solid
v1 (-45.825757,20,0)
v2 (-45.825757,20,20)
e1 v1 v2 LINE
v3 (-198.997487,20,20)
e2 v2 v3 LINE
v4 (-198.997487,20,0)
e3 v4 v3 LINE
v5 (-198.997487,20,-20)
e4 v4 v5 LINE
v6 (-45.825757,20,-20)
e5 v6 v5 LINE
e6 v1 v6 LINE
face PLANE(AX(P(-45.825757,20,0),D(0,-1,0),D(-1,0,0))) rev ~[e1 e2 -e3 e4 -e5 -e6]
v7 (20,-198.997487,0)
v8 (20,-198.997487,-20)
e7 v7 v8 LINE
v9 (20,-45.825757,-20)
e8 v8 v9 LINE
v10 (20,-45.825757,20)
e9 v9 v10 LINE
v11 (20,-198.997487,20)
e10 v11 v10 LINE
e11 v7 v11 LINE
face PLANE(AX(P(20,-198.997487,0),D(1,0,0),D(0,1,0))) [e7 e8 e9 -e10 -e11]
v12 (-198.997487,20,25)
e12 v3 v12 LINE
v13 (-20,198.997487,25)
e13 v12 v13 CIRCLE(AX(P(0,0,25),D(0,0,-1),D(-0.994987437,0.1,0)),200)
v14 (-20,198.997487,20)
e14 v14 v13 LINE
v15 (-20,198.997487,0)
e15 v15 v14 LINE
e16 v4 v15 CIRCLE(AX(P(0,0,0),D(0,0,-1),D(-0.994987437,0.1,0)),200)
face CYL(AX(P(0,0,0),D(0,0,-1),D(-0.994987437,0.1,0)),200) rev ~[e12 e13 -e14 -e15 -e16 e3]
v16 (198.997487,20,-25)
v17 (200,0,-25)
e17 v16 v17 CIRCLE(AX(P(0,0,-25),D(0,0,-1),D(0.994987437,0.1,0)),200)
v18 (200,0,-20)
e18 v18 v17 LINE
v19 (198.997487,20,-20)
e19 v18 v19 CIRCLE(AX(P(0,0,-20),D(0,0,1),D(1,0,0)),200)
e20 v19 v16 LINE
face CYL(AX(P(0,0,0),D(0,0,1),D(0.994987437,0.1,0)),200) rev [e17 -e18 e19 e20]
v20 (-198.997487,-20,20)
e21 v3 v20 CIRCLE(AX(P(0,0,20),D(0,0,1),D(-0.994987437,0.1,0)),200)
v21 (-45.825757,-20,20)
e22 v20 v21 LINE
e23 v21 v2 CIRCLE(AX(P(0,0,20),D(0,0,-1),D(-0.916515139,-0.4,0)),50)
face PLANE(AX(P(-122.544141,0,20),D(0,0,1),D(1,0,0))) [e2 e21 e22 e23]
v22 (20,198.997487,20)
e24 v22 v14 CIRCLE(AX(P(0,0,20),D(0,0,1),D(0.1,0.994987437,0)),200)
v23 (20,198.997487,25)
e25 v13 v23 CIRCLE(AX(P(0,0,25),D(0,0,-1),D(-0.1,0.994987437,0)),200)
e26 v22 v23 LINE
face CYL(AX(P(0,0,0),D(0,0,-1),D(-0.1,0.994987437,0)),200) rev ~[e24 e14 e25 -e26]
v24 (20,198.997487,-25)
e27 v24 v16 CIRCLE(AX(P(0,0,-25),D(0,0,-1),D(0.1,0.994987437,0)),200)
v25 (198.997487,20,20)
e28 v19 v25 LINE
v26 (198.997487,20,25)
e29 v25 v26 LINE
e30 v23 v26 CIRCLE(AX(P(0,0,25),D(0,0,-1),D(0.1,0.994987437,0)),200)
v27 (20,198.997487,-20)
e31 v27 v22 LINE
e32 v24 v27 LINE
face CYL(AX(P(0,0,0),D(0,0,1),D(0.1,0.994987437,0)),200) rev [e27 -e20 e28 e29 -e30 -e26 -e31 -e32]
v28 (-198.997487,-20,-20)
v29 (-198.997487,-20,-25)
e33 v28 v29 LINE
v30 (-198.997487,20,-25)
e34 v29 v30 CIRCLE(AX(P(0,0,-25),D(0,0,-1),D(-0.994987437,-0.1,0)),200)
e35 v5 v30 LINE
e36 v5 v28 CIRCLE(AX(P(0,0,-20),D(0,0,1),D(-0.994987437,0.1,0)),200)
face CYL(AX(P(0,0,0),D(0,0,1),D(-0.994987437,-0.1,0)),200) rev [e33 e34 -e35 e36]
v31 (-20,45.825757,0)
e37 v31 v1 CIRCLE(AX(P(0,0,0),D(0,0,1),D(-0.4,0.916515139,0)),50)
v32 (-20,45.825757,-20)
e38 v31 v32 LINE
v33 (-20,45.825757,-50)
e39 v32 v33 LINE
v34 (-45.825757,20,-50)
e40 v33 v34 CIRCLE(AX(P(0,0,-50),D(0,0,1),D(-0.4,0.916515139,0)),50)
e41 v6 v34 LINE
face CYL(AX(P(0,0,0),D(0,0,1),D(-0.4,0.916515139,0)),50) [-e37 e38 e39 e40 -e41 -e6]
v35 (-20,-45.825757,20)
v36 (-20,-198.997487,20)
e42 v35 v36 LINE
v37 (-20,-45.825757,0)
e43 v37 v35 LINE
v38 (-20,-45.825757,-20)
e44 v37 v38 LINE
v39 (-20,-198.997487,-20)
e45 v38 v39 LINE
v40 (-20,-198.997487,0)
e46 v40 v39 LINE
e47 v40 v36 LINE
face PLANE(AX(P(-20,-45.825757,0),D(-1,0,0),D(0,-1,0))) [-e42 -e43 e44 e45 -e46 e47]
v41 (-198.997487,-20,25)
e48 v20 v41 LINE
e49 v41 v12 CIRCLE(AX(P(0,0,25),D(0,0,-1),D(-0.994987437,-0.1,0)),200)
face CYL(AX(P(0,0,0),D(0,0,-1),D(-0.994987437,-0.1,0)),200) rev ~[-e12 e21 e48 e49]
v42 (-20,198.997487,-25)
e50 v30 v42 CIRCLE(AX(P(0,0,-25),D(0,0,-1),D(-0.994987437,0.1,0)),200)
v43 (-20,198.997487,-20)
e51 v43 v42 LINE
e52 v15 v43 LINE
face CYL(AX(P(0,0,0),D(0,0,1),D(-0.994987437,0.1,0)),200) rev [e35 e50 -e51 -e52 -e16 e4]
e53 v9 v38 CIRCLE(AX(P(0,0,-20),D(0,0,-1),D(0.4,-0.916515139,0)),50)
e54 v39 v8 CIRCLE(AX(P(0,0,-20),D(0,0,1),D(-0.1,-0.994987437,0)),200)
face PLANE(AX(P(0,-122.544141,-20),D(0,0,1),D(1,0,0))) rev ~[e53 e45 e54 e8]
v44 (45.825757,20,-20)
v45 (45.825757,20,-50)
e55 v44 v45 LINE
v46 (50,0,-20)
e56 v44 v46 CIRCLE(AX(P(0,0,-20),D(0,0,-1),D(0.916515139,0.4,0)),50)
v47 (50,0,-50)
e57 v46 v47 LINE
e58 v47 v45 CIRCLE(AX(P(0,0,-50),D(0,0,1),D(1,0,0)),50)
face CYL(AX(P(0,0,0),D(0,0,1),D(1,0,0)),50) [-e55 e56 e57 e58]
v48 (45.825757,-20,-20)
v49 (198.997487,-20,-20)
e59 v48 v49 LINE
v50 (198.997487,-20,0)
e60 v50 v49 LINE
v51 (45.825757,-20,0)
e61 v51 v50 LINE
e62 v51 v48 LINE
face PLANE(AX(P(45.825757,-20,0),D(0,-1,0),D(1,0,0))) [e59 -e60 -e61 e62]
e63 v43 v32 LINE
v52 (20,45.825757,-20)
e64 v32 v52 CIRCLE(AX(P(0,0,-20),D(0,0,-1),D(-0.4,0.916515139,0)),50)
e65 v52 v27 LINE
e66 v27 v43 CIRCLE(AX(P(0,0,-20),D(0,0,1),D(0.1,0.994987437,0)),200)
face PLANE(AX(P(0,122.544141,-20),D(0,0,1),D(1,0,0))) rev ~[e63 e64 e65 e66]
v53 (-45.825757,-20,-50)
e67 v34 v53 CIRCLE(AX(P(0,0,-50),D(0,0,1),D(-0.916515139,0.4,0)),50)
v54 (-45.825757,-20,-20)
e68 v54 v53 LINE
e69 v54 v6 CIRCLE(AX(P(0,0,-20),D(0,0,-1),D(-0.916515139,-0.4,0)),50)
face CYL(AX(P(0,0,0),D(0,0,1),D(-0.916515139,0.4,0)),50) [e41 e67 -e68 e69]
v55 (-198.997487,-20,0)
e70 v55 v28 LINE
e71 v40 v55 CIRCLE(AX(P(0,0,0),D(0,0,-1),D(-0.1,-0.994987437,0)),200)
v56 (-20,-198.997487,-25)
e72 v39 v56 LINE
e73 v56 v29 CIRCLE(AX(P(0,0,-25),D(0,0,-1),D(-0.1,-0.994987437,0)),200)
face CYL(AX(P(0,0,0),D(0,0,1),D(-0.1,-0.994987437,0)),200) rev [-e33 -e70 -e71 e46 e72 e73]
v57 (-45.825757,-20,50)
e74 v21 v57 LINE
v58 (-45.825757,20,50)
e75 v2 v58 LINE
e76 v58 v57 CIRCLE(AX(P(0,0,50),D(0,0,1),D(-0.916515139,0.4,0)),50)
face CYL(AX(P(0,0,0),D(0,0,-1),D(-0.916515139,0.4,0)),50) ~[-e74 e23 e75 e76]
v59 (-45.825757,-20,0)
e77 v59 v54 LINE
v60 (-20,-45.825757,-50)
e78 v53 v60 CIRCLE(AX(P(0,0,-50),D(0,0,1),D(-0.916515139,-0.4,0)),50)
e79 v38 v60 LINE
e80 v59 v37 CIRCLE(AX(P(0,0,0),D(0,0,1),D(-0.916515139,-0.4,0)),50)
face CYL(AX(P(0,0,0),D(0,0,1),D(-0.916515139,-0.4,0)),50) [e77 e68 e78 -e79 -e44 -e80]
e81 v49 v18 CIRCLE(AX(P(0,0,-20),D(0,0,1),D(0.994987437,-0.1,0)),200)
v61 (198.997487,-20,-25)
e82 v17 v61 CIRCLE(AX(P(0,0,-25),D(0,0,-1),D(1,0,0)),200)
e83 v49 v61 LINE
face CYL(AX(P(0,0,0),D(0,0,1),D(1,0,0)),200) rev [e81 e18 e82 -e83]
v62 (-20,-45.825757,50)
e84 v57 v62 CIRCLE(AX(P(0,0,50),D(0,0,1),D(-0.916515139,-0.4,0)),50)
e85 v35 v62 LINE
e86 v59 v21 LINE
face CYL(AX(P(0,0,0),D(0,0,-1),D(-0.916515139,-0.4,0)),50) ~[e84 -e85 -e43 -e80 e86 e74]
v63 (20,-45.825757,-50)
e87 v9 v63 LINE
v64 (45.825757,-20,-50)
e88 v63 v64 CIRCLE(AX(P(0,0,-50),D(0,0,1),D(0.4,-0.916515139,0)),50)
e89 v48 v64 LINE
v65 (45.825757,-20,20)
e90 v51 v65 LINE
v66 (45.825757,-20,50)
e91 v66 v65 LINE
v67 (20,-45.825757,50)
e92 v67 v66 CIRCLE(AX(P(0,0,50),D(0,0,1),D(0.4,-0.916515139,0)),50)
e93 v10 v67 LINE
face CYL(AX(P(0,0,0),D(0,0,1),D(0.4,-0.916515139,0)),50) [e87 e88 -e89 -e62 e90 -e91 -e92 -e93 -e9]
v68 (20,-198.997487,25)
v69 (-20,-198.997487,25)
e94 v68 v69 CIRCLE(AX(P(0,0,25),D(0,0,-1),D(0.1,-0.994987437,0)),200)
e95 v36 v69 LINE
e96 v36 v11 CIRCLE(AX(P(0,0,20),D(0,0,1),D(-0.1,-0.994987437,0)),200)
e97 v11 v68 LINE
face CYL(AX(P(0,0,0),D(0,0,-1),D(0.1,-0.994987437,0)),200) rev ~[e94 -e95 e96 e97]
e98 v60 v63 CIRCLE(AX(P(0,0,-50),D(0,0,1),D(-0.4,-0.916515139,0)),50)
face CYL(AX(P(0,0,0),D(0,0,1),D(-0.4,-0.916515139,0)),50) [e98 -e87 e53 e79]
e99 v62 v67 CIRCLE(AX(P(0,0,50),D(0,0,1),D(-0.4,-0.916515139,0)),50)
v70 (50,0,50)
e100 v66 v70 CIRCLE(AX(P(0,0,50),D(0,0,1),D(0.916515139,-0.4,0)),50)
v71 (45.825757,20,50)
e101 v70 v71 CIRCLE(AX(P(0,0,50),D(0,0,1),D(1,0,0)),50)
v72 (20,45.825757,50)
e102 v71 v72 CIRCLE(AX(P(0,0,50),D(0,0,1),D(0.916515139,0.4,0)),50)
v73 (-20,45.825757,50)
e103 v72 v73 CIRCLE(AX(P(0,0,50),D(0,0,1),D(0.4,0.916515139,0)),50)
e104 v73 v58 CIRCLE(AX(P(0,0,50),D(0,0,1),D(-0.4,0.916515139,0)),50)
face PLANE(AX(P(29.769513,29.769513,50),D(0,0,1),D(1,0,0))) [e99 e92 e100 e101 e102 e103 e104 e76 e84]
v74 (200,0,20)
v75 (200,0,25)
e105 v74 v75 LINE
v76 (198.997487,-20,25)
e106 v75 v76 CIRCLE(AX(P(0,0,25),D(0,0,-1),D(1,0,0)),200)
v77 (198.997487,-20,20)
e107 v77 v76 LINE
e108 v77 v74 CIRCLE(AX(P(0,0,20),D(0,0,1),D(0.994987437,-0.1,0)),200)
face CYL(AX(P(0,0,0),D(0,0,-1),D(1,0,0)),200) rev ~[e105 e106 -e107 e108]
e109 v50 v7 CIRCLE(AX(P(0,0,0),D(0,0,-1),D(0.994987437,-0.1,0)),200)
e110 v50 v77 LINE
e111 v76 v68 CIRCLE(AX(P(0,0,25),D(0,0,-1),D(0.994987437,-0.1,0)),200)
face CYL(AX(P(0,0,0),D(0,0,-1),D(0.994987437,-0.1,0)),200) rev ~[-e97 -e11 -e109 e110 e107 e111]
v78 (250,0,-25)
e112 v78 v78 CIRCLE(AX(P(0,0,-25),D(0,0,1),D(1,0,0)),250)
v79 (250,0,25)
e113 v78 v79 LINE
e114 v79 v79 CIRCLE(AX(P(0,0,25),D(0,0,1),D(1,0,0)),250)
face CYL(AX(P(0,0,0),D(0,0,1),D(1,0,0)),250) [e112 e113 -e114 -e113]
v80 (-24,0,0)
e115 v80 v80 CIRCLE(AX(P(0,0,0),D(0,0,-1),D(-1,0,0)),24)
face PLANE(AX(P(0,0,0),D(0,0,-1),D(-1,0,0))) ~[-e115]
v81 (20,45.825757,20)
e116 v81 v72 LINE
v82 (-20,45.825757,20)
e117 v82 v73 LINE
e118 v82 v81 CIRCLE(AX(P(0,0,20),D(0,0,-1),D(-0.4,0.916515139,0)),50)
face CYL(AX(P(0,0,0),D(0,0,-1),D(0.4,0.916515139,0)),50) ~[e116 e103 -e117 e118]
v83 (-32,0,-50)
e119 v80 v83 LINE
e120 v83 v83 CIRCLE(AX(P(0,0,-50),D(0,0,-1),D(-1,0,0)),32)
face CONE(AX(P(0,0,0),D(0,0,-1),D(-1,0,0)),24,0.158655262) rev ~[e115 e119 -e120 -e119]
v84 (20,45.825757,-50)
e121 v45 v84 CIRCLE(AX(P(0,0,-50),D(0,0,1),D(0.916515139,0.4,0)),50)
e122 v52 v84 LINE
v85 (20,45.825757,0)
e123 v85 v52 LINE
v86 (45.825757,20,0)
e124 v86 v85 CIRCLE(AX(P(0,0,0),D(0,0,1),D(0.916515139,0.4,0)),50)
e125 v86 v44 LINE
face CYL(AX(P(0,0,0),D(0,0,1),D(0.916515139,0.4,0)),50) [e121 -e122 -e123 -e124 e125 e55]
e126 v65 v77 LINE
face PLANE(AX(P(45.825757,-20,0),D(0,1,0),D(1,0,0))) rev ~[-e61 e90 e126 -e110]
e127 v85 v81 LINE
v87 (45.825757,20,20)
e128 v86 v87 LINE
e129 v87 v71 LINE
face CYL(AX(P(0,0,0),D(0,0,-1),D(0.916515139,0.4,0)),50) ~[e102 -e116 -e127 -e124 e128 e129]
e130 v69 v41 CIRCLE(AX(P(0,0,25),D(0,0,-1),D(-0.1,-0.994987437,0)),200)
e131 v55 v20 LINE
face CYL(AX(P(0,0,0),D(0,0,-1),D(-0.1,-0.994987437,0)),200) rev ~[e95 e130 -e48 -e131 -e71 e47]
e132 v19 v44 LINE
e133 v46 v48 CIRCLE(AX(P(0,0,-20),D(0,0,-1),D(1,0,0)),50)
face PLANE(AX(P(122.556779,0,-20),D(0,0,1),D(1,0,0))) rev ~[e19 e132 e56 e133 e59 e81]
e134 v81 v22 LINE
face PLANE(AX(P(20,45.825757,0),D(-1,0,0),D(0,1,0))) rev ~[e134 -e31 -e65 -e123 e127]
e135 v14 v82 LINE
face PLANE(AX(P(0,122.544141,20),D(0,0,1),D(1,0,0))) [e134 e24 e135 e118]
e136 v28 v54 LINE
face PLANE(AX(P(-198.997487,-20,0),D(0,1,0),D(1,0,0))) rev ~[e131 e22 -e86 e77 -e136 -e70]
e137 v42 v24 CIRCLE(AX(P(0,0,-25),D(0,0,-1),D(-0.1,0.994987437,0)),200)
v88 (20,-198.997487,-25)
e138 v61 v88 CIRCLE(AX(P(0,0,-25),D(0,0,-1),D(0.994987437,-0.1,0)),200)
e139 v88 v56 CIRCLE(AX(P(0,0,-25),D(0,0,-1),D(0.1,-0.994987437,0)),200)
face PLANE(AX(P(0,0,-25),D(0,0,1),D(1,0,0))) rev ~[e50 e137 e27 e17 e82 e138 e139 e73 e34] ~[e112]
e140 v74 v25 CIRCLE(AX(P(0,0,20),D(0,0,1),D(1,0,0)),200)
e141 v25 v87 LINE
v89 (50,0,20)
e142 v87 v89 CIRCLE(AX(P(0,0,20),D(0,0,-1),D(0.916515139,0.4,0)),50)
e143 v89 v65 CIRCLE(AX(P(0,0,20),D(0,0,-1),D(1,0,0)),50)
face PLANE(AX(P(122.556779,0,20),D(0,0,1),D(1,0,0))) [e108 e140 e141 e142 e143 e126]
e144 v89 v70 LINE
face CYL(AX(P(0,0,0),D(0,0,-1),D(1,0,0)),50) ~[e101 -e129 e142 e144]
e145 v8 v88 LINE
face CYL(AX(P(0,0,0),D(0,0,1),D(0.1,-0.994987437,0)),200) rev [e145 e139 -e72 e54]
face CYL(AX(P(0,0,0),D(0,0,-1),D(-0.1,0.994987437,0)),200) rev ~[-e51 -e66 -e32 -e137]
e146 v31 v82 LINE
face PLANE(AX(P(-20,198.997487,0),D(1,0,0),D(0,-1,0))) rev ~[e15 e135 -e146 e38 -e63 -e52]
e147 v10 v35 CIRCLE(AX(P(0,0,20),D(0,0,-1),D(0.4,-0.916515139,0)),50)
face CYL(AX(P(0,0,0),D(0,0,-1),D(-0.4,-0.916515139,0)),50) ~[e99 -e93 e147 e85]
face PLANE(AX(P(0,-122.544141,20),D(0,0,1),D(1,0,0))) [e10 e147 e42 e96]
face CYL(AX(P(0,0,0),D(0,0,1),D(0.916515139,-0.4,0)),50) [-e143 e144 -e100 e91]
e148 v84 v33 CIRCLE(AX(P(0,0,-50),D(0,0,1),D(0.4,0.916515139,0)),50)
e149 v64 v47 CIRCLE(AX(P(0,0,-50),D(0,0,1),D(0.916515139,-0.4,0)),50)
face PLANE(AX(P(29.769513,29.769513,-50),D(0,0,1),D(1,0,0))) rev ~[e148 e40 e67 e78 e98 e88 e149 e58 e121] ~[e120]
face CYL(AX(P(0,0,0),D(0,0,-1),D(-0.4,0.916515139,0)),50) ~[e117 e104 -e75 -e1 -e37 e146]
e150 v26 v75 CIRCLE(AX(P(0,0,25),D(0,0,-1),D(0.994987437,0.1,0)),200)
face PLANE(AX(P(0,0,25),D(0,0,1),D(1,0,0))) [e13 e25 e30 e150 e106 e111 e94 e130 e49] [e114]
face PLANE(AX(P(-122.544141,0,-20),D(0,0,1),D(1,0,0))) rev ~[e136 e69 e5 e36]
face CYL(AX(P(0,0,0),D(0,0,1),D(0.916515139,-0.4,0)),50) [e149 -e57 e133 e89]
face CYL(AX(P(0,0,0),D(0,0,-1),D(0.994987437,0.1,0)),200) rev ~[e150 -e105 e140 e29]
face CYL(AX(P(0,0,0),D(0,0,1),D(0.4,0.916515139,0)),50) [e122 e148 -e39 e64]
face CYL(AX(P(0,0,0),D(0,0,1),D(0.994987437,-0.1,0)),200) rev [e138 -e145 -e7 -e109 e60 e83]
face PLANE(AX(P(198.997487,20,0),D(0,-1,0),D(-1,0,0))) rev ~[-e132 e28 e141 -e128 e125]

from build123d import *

# Parameters (mm, degrees)
F0_R     = 250
F1_DEPTH = 25
F0_W     = 40
F0_H     = 40
F2_DEPTH = 50
F3_DEPTH = 20


with BuildPart() as f1:
    # F0 (on Top) → F1 (new body, symmetric)
    with BuildSketch(Plane.XY):
        Circle(F0_R)
        with BuildLine():
            ThreePointArc((20, 198.9974874213), (141.4213562373, 141.4213562373), (198.9974874213, 20))
            Line((198.9974874213, 20), (220.8077311516, 20))
            Line((220.8077311516, 20), (220.8077311516, -20))
            Line((220.8077311516, -20), (198.9974874213, -20))
            ThreePointArc((198.9974874213, -20), (141.4213562373, -141.4213562373), (20, -198.9974874213))
            Line((20, -198.9974874213), (20, -220.8077311516))
            Line((20, -220.8077311516), (-20, -220.8077311516))
            Line((-20, -220.8077311516), (-20, -198.9974874213))
            ThreePointArc((-20, -198.9974874213), (-141.4213562373, -141.4213562373), (-198.9974874213, -20))
            Line((-198.9974874213, -20), (-220.8077311516, -20))
            Line((-220.8077311516, -20), (-220.8077311516, 20))
            Line((-220.8077311516, 20), (-198.9974874213, 20))
            ThreePointArc((-198.9974874213, 20), (-141.4213562373, 141.4213562373), (-20, 198.9974874213))
            Line((-20, 198.9974874213), (-20, 220.8077311516))
            Line((-20, 220.8077311516), (20, 220.8077311516))
            Line((20, 220.8077311516), (20, 198.9974874213))
        make_face(mode=Mode.SUBTRACT)
        with BuildLine():
            ThreePointArc((-198.9974874213, -20), (-200, 0), (-198.9974874213, 20))
            Line((-198.9974874213, 20), (-220.8077311516, 20))
            Line((-220.8077311516, 20), (-220.8077311516, -20))
            Line((-220.8077311516, -20), (-198.9974874213, -20))
        make_face()
        with BuildLine():
            Line((20, -220.8077311516), (20, -198.9974874213))
            ThreePointArc((20, -198.9974874213), (0, -200), (-20, -198.9974874213))
            Line((-20, -198.9974874213), (-20, -220.8077311516))
            Line((-20, -220.8077311516), (20, -220.8077311516))
        make_face()
        with BuildLine():
            Line((220.8077311516, 20), (198.9974874213, 20))
            ThreePointArc((198.9974874213, 20), (199.7492146221, 10.012555012), (200, 0))
            ThreePointArc((200, 0), (199.7492146221, -10.012555012), (198.9974874213, -20))
            Line((198.9974874213, -20), (220.8077311516, -20))
            Line((220.8077311516, -20), (220.8077311516, 20))
        make_face()
        with BuildLine():
            ThreePointArc((-20, 198.9974874213), (0, 200), (20, 198.9974874213))
            Line((20, 198.9974874213), (20, 220.8077311516))
            Line((20, 220.8077311516), (-20, 220.8077311516))
            Line((-20, 220.8077311516), (-20, 198.9974874213))
        make_face()
    extrude(amount=F1_DEPTH, both=True)



with BuildPart() as f2:
    # F0 (on Top) → F2 (new body, symmetric)
    with BuildSketch(Plane.XY):
        with BuildLine():
            Line((20, 20), (45.8257569496, 20))
            ThreePointArc((45.8257569496, 20), (35.3553390593, 35.3553390593), (20, 45.8257569496))
            Line((20, 45.8257569496), (20, 20))
        make_face()
        with BuildLine():
            Line((20, 20), (20, 45.8257569496))
            ThreePointArc((20, 45.8257569496), (0, 50), (-20, 45.8257569496))
            Line((-20, 45.8257569496), (-20, 20))
            Line((-20, 20), (20, 20))
        make_face()
        with BuildLine():
            Line((-20, 20), (-20, 45.8257569496))
            ThreePointArc((-20, 45.8257569496), (-35.3553390593, 35.3553390593), (-45.8257569496, 20))
            Line((-45.8257569496, 20), (-20, 20))
        make_face()
        with BuildLine():
            Line((-20, -20), (-20, 20))
            Line((-20, 20), (-45.8257569496, 20))
            ThreePointArc((-45.8257569496, 20), (-50, 0), (-45.8257569496, -20))
            Line((-45.8257569496, -20), (-20, -20))
        make_face()
        with BuildLine():
            ThreePointArc((-45.8257569496, -20), (-35.3553390593, -35.3553390593), (-20, -45.8257569496))
            Line((-20, -45.8257569496), (-20, -20))
            Line((-20, -20), (-45.8257569496, -20))
        make_face()
        with BuildLine():
            ThreePointArc((-20, -45.8257569496), (0, -50), (20, -45.8257569496))
            Line((20, -45.8257569496), (20, -20))
            Line((20, -20), (-20, -20))
            Line((-20, -20), (-20, -45.8257569496))
        make_face()
        with BuildLine():
            ThreePointArc((20, -45.8257569496), (35.3553390593, -35.3553390593), (45.8257569496, -20))
            Line((45.8257569496, -20), (20, -20))
            Line((20, -20), (20, -45.8257569496))
        make_face()
        with BuildLine():
            ThreePointArc((45.8257569496, -20), (48.9453156465, -10.2154821845), (50, 0))
            ThreePointArc((50, 0), (48.9453156465, 10.2154821845), (45.8257569496, 20))
            Line((45.8257569496, 20), (20, 20))
            Line((20, 20), (20, -20))
            Line((20, -20), (45.8257569496, -20))
        make_face()
        with BuildLine():
            Line((-20, -20), (-20, 20))
            Line((-20, 20), (-45.8257569496, 20))
            ThreePointArc((-45.8257569496, 20), (-50, 0), (-45.8257569496, -20))
            Line((-45.8257569496, -20), (-20, -20))
        make_face()
        Rectangle(F0_W, F0_H)
        with BuildLine():
            ThreePointArc((-20, -45.8257569496), (0, -50), (20, -45.8257569496))
            Line((20, -45.8257569496), (20, -20))
            Line((20, -20), (-20, -20))
            Line((-20, -20), (-20, -45.8257569496))
        make_face()
        with BuildLine():
            ThreePointArc((45.8257569496, -20), (48.9453156465, -10.2154821845), (50, 0))
            ThreePointArc((50, 0), (48.9453156465, 10.2154821845), (45.8257569496, 20))
            Line((45.8257569496, 20), (20, 20))
            Line((20, 20), (20, -20))
            Line((20, -20), (45.8257569496, -20))
        make_face()
        with BuildLine():
            Line((20, 20), (20, 45.8257569496))
            ThreePointArc((20, 45.8257569496), (0, 50), (-20, 45.8257569496))
            Line((-20, 45.8257569496), (-20, 20))
            Line((-20, 20), (20, 20))
        make_face()
    extrude(amount=F2_DEPTH, both=True)


with BuildPart() as f1_1:
    add(f1.part)

    add(f2.part)  # F3 merges F2
    # F0 (on Top) → F3 (join, symmetric)
    with BuildSketch(Plane.XY):
        with BuildLine():
            ThreePointArc((-45.8257569496, -20), (-50, 0), (-45.8257569496, 20))
            Line((-45.8257569496, 20), (-198.9974874213, 20))
            ThreePointArc((-198.9974874213, 20), (-200, 0), (-198.9974874213, -20))
            Line((-198.9974874213, -20), (-45.8257569496, -20))
        make_face()
        with BuildLine():
            ThreePointArc((-20, 45.8257569496), (0, 50), (20, 45.8257569496))
            Line((20, 45.8257569496), (20, 198.9974874213))
            ThreePointArc((20, 198.9974874213), (0, 200), (-20, 198.9974874213))
            Line((-20, 198.9974874213), (-20, 45.8257569496))
        make_face()
        with BuildLine():
            ThreePointArc((45.8257569496, 20), (48.9453156465, 10.2154821845), (50, 0))
            ThreePointArc((50, 0), (48.9453156465, -10.2154821845), (45.8257569496, -20))
            Line((45.8257569496, -20), (198.9974874213, -20))
            ThreePointArc((198.9974874213, -20), (199.7492146221, -10.012555012), (200, 0))
            ThreePointArc((200, 0), (199.7492146221, 10.012555012), (198.9974874213, 20))
            Line((198.9974874213, 20), (45.8257569496, 20))
        make_face()
        with BuildLine():
            Line((20, -198.9974874213), (20, -45.8257569496))
            ThreePointArc((20, -45.8257569496), (0, -50), (-20, -45.8257569496))
            Line((-20, -45.8257569496), (-20, -198.9974874213))
            ThreePointArc((-20, -198.9974874213), (0, -200), (20, -198.9974874213))
        make_face()
    extrude(amount=F3_DEPTH, both=True)

    # F4 (on Front) → F5 (revolve, cut)
    with BuildSketch(Plane.XZ):
        Polygon((0, -50), (0, 0), (-24, 0), (-32, -50), align=None)
    revolve(axis=Axis((0, 0, -25), (0, 0, -1)), mode=Mode.SUBTRACT)


solid = f1_1.part
